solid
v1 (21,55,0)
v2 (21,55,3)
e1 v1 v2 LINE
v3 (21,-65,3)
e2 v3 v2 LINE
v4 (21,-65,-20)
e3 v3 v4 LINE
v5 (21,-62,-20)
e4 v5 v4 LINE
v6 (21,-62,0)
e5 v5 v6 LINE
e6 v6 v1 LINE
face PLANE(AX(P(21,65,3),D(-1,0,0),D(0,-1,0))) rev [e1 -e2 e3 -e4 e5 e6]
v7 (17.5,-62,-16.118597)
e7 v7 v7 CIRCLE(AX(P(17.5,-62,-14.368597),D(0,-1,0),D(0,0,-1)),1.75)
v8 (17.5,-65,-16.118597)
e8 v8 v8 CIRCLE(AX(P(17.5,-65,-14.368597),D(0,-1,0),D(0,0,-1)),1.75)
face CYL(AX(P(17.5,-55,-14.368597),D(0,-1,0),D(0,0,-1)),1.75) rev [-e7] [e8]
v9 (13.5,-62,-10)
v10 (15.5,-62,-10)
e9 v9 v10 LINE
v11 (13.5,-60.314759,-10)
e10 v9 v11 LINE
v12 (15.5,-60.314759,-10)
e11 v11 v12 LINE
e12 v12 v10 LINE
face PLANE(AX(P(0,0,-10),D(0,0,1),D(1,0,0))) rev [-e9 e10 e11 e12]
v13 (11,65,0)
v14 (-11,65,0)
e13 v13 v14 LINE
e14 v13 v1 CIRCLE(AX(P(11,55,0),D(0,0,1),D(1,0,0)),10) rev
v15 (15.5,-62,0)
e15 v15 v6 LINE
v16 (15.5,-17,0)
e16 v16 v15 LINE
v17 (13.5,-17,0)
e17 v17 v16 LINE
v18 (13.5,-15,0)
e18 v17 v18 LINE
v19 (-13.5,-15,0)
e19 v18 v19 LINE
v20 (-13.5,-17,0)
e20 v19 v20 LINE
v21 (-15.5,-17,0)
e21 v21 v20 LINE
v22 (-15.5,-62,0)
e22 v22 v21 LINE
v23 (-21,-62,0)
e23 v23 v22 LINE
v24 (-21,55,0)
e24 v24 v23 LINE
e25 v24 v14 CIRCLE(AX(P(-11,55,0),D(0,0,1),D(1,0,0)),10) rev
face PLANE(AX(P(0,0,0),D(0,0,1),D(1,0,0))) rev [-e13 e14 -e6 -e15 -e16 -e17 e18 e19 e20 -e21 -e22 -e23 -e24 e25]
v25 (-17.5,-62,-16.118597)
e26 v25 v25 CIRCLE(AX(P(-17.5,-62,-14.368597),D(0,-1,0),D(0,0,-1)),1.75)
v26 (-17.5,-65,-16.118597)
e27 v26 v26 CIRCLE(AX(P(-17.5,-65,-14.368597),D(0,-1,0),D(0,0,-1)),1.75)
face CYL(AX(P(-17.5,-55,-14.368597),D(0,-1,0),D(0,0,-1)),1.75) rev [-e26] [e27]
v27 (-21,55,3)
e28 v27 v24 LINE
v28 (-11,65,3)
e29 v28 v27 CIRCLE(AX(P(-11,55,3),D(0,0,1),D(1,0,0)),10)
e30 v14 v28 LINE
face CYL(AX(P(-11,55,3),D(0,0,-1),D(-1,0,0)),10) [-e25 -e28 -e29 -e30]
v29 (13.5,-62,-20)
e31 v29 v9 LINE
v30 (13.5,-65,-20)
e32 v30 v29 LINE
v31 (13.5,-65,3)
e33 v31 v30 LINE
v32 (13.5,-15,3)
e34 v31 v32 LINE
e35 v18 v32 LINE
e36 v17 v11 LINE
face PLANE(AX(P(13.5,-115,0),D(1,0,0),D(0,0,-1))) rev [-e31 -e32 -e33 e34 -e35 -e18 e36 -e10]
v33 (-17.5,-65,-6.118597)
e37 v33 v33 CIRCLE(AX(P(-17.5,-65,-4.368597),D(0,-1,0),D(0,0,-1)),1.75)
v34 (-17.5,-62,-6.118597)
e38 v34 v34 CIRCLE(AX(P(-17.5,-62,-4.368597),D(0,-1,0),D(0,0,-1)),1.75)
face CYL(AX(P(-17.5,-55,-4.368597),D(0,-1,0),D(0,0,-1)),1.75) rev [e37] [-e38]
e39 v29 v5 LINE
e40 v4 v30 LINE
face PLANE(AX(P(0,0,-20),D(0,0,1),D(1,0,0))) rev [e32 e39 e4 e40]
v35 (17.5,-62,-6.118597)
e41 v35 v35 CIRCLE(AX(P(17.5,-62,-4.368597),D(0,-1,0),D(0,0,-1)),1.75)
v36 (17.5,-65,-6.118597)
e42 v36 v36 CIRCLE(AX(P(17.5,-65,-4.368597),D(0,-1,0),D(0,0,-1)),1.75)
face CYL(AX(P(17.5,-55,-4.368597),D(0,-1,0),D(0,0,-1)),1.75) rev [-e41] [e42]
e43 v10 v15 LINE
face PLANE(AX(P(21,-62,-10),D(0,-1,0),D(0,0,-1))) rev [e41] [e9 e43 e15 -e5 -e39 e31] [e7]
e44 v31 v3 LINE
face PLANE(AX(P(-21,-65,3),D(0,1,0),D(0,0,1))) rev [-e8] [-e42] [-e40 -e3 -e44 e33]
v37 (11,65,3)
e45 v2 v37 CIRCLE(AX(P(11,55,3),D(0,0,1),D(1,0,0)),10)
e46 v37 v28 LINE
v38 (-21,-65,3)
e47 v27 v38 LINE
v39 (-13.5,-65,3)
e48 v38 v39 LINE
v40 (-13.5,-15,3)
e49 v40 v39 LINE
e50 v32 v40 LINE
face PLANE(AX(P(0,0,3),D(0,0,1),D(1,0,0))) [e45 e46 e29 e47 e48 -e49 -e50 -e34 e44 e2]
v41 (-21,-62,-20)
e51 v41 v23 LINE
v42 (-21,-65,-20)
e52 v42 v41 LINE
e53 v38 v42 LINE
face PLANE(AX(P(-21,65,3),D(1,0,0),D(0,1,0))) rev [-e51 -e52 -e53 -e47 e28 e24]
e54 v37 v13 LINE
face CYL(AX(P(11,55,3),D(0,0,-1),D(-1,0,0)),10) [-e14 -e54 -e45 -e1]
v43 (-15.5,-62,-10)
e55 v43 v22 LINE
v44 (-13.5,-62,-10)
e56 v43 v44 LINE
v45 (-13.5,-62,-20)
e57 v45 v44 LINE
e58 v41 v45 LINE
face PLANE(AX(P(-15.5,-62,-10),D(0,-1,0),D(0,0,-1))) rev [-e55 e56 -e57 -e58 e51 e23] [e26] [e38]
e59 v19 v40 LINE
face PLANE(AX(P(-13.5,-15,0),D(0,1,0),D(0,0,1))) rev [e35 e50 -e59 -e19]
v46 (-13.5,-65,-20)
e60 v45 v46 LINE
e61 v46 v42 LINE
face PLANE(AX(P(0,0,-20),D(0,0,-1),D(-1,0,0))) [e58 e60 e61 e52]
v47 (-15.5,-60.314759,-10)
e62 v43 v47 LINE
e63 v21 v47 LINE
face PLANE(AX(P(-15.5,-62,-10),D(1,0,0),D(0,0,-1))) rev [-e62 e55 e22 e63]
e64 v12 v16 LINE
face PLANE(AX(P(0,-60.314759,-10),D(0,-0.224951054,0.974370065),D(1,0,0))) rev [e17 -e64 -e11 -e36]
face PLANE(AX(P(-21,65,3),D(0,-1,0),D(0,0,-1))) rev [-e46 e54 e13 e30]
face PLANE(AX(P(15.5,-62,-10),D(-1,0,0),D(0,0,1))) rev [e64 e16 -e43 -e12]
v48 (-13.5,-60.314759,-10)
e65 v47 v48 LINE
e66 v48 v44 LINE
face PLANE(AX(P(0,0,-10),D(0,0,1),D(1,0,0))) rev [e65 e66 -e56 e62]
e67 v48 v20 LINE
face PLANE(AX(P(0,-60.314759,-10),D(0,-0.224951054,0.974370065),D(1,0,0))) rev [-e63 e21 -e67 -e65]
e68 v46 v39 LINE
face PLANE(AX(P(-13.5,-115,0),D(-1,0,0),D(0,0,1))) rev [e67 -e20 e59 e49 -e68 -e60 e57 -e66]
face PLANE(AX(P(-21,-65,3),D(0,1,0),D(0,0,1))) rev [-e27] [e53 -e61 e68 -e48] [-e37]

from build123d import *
from OCP.BRepFilletAPI import BRepFilletAPI_MakeChamfer

# Parameters (mm, degrees)
SKETCH1_W           = 42
SKETCH1_H           = 130
BOSS_EXTRUDE1_DEPTH = 3
SKETCH2_W           = 27
SKETCH2_H           = 100
CUT_EXTRUDE1_DEPTH  = 3
BOSS_EXTRUDE2_DEPTH = 10
CHAMFER1_SIZE       = 43.314758743
CHAMFER1_SIZE_2     = 10
SKETCH5_R           = 1.75
CUT_EXTRUDE2_DEPTH  = 10
SKETCH6_W           = 7.5
SKETCH6_H           = 3
BOSS_EXTRUDE3_DEPTH = 10
LPATTERN1_COUNT     = 2
LPATTERN1_PITCH     = 10
FILLET1_R           = 10


with BuildPart() as part:
    # Sketch1 → Boss-Extrude1 (new body)
    with BuildSketch(Plane.XY):
        Rectangle(SKETCH1_W, SKETCH1_H)
    extrude(amount=BOSS_EXTRUDE1_DEPTH)

    # Sketch2 → Cut-Extrude1 (cut)
    with BuildSketch(Plane.XY.offset(3)):
        with Locations((0, -65)):
            Rectangle(SKETCH2_W, SKETCH2_H)
    extrude(amount=-CUT_EXTRUDE1_DEPTH, mode=Mode.SUBTRACT)

    # Sketch3 → Boss-Extrude2 (add)
    with BuildSketch(Plane(origin=(0, 0, 0), x_dir=(-1, 0, 0), z_dir=(0, 0, -1))):
        Polygon((-21, -65), (-13.5, -65), (-13.5, -62), (-13.5, -17), (-15.5, -17), (-15.5, -62), (-21, -62), align=None)
        Polygon((13.5, -65), (21, -65), (21, -62), (15.5, -62), (15.5, -17), (13.5, -17), (13.5, -62), align=None)
    extrude(amount=BOSS_EXTRUDE2_DEPTH)

    # Chamfer1
    chamfer1_edges_1 = [part.edges().sort_by_distance(p)[0] for p in [
        (-14.5, -17, -10),
    ]]
    chamfer1_side_1 = [part.faces().sort_by_distance(p)[0] for p in [
        (-14.5, -17.2, -10),
    ]]
    chamfer1_edges_2 = [part.edges().sort_by_distance(p)[0] for p in [
        (14.5, -17, -10),
    ]]
    chamfer1_side_2 = [part.faces().sort_by_distance(p)[0] for p in [
        (14.5, -17.2, -10),
    ]]
    chamfer1 = BRepFilletAPI_MakeChamfer(part.part.solid().wrapped)
    for e in chamfer1_edges_1:
        chamfer1.Add(CHAMFER1_SIZE - 0.0001, CHAMFER1_SIZE_2 - 0.0001, e.wrapped, chamfer1_side_1[0].wrapped)
    for e in chamfer1_edges_2:
        chamfer1.Add(CHAMFER1_SIZE - 0.0001, CHAMFER1_SIZE_2 - 0.0001, e.wrapped, chamfer1_side_2[0].wrapped)
    add(Compound.cast(chamfer1.Shape()), mode=Mode.REPLACE)  # a hair under: the kernel refuses the full size

    # Sketch5 → Cut-Extrude2 (cut)
    with BuildSketch(Plane.XZ.offset(65)):
        with Locations(Location((-17.5, -4.36859694, 0), (0, 0, 270))):
            Circle(SKETCH5_R)
        with Locations(Location((17.5, -4.36859694, 0), (0, 0, 270))):
            Circle(SKETCH5_R)
    cut_extrude2 = extrude(amount=-CUT_EXTRUDE2_DEPTH, mode=Mode.SUBTRACT)

    # Sketch6 → Boss-Extrude3 (add)
    with BuildSketch(Plane(origin=(0, 0, -10), x_dir=(-1, 0, 0), z_dir=(0, 0, -1))):
        with Locations((17.25, -63.5)):
            Rectangle(SKETCH6_W, SKETCH6_H)
        with Locations((-17.25, -63.5)):
            Rectangle(SKETCH6_W, SKETCH6_H)
    extrude(amount=BOSS_EXTRUDE3_DEPTH)

    # LPattern1: Cut-Extrude2 ×2
    with Locations(*[(0, 0, -i * LPATTERN1_PITCH) for i in range(1, LPATTERN1_COUNT)]):
        add(cut_extrude2, mode=Mode.SUBTRACT)

    # Fillet1
    fillet1_edges = [part.edges().sort_by_distance(p)[0] for p in [
        (-21, 65, 1.5),
        (21, 65, 1.5),
    ]]
    fillet(fillet1_edges, radius=FILLET1_R)


solid = part.part
